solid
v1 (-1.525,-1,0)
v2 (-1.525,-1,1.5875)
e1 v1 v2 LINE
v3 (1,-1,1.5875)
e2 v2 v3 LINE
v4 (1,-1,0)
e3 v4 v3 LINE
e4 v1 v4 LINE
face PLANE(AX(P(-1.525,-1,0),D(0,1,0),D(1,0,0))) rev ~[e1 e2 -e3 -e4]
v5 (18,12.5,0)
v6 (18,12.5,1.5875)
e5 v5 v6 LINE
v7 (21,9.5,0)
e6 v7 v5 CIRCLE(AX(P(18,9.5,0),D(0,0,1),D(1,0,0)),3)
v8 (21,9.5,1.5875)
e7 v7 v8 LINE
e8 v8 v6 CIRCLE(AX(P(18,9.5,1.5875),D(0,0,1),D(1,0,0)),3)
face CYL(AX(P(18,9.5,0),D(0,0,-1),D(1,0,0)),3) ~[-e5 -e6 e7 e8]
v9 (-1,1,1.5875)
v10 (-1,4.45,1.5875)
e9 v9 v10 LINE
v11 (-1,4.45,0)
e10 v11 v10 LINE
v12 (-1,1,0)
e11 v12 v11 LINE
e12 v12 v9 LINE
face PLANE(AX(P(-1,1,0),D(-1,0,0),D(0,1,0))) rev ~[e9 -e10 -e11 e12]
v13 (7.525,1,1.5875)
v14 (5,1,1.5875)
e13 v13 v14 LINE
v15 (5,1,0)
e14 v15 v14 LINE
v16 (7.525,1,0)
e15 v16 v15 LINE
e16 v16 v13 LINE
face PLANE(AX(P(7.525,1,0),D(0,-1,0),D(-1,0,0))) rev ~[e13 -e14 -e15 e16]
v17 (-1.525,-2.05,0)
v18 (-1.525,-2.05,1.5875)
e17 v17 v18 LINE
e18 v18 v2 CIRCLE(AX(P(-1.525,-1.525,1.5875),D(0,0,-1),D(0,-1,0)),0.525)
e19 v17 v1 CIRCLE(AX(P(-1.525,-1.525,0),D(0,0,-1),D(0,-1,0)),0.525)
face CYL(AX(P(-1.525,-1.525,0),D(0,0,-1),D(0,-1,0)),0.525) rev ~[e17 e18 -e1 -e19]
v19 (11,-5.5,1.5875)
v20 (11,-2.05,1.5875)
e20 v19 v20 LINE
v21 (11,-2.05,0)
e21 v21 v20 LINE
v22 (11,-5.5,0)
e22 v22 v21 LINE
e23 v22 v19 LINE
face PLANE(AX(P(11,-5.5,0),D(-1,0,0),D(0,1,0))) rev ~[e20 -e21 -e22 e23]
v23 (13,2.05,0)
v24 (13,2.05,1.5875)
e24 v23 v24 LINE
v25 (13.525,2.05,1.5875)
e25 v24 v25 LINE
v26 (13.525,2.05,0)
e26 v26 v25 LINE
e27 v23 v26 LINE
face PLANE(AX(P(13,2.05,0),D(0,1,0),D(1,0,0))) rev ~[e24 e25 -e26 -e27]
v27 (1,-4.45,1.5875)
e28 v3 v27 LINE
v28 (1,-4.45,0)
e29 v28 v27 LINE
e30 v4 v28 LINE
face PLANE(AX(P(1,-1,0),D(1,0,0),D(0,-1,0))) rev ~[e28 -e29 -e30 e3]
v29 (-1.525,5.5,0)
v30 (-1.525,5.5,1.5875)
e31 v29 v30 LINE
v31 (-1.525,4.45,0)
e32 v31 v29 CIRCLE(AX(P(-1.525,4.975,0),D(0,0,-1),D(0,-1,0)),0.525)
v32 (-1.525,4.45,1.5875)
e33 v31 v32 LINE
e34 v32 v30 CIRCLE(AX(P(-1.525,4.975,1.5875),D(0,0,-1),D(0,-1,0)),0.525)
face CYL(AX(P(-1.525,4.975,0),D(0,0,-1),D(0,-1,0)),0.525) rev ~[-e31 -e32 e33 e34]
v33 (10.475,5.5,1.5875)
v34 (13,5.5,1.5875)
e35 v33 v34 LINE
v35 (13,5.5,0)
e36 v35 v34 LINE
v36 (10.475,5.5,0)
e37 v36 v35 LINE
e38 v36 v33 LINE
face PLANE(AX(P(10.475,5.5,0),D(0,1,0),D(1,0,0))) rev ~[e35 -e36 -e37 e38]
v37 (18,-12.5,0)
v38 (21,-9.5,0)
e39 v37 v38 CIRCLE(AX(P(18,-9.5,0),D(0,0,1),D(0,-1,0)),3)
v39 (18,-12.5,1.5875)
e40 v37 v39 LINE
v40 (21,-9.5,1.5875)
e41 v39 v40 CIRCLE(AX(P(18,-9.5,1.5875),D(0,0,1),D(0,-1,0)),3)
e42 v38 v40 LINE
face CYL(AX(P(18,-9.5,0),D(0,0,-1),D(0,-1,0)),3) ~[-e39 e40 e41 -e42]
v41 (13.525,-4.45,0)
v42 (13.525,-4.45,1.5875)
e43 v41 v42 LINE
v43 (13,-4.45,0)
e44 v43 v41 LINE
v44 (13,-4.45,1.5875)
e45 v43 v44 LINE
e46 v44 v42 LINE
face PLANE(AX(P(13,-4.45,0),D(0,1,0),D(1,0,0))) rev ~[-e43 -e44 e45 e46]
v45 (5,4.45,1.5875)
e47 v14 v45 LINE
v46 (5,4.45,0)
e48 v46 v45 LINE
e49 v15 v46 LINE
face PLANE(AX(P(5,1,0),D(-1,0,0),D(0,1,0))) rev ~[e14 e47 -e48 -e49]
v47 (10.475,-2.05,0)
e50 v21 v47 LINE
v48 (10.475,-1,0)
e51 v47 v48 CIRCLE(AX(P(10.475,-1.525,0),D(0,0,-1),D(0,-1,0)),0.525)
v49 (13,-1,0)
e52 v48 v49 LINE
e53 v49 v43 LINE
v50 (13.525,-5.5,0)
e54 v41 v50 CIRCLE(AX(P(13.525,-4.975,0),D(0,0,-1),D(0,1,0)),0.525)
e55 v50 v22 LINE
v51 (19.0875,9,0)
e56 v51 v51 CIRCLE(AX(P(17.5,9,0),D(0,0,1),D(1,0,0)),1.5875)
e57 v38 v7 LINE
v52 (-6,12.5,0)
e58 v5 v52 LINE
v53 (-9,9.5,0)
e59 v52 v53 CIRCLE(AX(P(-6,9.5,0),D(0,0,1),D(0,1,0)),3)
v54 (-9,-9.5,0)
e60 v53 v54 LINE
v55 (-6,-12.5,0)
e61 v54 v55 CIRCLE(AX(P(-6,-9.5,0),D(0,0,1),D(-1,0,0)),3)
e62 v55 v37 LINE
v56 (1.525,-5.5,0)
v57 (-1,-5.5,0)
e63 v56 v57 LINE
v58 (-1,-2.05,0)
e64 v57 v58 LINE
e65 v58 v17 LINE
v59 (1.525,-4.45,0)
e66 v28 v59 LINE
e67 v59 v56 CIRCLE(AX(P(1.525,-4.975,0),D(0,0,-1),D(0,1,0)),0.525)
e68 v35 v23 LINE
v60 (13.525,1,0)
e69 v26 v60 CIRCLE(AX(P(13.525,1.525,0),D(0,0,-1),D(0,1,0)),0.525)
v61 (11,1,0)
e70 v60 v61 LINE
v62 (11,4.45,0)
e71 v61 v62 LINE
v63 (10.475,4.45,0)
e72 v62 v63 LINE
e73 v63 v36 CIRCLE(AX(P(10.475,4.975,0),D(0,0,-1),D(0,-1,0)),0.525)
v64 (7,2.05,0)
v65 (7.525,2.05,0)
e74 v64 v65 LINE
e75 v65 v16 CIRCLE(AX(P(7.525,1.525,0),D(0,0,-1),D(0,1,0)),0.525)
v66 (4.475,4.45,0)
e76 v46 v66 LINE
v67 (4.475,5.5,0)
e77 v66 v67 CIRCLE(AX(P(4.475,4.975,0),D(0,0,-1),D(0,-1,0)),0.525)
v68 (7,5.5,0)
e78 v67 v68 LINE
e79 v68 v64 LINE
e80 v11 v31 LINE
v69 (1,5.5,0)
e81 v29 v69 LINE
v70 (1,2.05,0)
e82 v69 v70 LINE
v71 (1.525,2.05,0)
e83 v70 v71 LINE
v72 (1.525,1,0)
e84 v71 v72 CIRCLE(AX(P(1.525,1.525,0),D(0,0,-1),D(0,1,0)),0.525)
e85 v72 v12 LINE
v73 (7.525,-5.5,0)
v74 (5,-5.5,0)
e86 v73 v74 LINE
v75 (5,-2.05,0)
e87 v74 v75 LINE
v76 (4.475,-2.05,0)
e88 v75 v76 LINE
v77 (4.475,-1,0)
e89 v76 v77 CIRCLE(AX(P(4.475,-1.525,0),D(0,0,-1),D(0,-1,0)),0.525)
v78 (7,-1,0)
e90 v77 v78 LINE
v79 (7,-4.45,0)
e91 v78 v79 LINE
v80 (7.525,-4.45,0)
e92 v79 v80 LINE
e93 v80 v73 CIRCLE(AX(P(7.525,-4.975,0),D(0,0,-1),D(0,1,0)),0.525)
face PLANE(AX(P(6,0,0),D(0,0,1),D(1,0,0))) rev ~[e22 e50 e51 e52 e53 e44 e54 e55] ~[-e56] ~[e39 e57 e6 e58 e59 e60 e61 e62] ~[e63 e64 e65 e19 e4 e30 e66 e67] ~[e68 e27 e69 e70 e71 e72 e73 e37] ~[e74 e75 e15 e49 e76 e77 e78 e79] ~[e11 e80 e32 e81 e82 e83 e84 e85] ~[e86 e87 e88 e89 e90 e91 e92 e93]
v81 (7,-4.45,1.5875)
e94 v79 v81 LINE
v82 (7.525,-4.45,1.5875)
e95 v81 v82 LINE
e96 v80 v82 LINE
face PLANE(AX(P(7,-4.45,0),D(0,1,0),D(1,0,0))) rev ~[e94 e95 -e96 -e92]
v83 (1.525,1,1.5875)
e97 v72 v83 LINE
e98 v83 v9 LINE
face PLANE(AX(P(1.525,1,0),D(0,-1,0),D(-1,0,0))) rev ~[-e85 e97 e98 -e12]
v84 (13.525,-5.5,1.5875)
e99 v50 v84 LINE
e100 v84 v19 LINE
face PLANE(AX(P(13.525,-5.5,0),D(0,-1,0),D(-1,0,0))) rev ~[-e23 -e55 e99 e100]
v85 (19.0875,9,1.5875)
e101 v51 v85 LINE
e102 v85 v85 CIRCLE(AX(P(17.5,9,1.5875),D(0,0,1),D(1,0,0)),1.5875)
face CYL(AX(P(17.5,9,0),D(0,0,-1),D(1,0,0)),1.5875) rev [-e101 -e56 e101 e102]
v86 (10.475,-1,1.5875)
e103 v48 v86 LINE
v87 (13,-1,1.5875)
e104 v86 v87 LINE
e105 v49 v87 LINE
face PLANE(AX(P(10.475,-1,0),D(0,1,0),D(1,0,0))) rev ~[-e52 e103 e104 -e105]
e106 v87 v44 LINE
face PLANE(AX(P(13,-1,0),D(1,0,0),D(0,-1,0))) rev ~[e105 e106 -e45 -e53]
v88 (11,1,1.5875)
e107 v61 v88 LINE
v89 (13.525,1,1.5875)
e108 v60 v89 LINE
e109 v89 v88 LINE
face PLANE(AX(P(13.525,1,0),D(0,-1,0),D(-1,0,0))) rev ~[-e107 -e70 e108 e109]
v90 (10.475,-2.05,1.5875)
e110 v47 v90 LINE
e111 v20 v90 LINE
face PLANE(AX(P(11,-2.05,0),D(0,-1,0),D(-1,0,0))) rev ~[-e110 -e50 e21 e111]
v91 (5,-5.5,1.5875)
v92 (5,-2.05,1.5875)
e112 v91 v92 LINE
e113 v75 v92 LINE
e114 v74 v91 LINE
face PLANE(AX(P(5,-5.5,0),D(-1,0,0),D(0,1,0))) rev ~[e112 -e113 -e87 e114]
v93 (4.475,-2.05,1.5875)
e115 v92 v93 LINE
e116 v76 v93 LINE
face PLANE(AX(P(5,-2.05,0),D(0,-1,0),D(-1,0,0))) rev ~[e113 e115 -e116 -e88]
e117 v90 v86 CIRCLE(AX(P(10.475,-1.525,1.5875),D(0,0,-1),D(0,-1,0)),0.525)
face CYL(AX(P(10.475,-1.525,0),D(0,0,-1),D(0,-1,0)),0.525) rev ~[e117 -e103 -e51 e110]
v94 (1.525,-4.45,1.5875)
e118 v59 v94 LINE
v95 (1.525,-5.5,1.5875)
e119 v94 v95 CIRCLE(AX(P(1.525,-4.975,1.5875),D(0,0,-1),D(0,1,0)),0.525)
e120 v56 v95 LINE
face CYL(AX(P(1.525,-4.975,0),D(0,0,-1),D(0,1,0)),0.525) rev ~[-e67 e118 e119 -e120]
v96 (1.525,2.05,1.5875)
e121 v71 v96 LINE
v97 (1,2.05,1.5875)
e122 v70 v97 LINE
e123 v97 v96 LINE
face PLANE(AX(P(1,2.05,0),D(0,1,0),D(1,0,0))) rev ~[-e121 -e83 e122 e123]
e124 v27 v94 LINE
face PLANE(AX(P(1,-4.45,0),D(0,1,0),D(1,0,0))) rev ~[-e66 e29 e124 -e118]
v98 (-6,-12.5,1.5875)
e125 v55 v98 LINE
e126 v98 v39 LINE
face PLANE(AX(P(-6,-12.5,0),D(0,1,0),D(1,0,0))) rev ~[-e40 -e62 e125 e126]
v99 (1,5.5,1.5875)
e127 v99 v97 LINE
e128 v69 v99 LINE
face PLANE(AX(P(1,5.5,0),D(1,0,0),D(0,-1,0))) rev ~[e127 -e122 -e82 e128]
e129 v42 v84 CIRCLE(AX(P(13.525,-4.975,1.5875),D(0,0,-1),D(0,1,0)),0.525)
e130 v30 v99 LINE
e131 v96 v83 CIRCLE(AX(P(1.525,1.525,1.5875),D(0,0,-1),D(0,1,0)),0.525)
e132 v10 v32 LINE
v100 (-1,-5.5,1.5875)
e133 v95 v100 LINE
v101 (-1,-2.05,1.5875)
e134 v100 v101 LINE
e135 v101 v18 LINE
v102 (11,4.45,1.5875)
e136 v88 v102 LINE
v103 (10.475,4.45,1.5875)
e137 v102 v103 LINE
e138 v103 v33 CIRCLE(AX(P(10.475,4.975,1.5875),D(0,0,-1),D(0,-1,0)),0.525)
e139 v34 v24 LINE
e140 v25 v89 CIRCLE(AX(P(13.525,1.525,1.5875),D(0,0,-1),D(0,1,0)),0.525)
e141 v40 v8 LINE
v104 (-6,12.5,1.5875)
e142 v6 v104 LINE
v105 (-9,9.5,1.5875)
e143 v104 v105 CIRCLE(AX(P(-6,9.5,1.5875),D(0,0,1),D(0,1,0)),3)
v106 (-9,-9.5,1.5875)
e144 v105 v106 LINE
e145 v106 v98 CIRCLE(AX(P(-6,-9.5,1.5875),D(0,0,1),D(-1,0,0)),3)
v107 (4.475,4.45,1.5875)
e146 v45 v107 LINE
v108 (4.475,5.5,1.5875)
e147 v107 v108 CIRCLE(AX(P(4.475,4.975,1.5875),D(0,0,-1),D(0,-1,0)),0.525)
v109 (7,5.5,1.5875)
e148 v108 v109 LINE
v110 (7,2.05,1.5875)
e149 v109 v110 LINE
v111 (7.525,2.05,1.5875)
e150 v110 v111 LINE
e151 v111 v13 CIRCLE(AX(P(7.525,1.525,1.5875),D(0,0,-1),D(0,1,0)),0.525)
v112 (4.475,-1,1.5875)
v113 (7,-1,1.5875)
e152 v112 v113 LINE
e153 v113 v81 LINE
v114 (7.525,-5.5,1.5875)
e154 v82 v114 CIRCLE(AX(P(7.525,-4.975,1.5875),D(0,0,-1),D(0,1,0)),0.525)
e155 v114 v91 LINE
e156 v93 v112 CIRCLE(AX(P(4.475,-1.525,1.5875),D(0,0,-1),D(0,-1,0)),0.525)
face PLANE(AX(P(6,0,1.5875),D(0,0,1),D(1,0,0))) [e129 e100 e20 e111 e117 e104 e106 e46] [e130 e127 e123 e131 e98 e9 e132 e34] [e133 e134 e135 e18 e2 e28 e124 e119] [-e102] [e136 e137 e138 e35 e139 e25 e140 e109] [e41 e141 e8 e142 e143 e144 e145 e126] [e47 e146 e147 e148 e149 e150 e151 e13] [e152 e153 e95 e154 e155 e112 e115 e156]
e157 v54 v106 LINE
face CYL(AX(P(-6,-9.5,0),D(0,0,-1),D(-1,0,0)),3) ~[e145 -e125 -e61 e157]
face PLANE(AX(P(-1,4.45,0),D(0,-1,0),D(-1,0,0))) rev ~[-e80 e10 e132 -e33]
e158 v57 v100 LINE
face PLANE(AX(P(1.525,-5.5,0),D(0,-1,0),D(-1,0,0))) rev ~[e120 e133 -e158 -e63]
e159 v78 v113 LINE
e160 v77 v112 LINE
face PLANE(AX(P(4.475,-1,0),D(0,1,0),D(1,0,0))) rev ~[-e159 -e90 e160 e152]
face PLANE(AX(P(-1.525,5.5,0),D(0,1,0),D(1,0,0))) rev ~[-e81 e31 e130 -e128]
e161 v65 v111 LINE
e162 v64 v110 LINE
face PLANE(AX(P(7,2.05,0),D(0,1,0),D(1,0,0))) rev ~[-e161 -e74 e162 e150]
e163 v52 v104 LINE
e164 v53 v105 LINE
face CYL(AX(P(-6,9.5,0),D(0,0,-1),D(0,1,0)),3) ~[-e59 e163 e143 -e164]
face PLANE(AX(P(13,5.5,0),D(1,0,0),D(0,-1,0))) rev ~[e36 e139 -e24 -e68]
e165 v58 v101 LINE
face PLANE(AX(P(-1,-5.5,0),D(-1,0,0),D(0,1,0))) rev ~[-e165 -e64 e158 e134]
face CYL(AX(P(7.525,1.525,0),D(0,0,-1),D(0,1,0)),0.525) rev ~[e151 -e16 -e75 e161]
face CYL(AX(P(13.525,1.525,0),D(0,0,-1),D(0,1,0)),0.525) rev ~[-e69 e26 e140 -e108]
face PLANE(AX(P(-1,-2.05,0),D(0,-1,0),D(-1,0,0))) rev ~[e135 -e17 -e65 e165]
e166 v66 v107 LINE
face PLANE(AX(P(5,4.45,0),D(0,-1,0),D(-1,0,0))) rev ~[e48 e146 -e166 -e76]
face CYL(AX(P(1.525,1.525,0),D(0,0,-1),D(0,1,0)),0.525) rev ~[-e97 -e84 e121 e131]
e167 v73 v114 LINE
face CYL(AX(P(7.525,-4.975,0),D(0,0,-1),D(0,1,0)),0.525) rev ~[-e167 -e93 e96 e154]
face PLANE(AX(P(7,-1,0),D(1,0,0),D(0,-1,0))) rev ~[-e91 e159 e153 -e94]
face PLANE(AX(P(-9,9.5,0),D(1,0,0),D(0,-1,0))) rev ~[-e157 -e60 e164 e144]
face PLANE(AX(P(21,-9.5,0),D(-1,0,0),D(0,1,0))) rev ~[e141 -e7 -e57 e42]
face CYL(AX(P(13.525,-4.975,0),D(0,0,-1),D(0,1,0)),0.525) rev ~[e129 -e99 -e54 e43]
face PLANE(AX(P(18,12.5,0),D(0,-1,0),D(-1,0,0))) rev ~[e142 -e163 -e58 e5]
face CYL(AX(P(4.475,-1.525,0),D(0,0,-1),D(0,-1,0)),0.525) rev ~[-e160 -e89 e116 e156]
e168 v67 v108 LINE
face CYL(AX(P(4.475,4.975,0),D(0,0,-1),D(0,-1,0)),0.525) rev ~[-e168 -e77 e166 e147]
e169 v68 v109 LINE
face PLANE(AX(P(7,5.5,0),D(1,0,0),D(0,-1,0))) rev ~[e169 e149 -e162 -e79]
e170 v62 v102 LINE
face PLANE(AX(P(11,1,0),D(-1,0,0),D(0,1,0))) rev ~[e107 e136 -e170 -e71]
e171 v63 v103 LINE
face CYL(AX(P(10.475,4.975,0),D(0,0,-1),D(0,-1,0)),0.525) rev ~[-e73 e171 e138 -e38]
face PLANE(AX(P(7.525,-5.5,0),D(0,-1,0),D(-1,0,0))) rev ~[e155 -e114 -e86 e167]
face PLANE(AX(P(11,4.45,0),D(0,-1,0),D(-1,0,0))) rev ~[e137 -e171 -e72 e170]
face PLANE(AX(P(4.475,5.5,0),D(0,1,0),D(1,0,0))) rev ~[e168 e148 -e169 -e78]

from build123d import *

# Parameters (mm, degrees)
F0_R     = 1.5875
F1_DEPTH = 1.5875


# Not quite as in the source:
# - a length typed as a fraction of an inch, garbled in the dataset ("3 / 203.2 mm" for 3/8 in), is restored


with BuildPart() as f1:
    # F0 (on Top) → F1 (new body)
    with BuildSketch(Plane.XY):
        with BuildLine():
            Line((-6, -12.5), (18, -12.5))
            ThreePointArc((18, -12.5), (20.1213203436, -11.6213203436), (21, -9.5))
            Line((21, -9.5), (21, 9.5))
            ThreePointArc((21, 9.5), (20.1213203436, 11.6213203436), (18, 12.5))
            Line((18, 12.5), (-6, 12.5))
            ThreePointArc((-6, 12.5), (-8.1213203436, 11.6213203436), (-9, 9.5))
            Line((-9, 9.5), (-9, -9.5))
            ThreePointArc((-9, -9.5), (-8.1213203436, -11.6213203436), (-6, -12.5))
        make_face()
        with BuildLine():
            Line((1.525, -5.5), (1, -5.5))
            Line((1, -5.5), (-1, -5.5))
            Line((-1, -5.5), (-1, -2.05))
            Line((-1, -2.05), (-1.525, -2.05))
            ThreePointArc((-1.525, -2.05), (-2.05, -1.525), (-1.525, -1))
            Line((-1.525, -1), (-1, -1))
            Line((-1, -1), (1, -1))
            Line((1, -1), (1, -4.45))
            Line((1, -4.45), (1.525, -4.45))
            ThreePointArc((1.525, -4.45), (2.05, -4.975), (1.525, -5.5))
        make_face(mode=Mode.SUBTRACT)
        with BuildLine():
            Line((7.525, -5.5), (7, -5.5))
            Line((7, -5.5), (5, -5.5))
            Line((5, -5.5), (5, -2.05))
            Line((5, -2.05), (4.475, -2.05))
            ThreePointArc((4.475, -2.05), (3.95, -1.525), (4.475, -1))
            Line((4.475, -1), (5, -1))
            Line((5, -1), (7, -1))
            Line((7, -1), (7, -4.45))
            Line((7, -4.45), (7.525, -4.45))
            ThreePointArc((7.525, -4.45), (8.05, -4.975), (7.525, -5.5))
        make_face(mode=Mode.SUBTRACT)
        with BuildLine():
            Line((13.525, -5.5), (13, -5.5))
            Line((13, -5.5), (11, -5.5))
            Line((11, -5.5), (11, -2.05))
            Line((11, -2.05), (10.475, -2.05))
            ThreePointArc((10.475, -2.05), (9.95, -1.525), (10.475, -1))
            Line((10.475, -1), (11, -1))
            Line((11, -1), (13, -1))
            Line((13, -1), (13, -4.45))
            Line((13, -4.45), (13.525, -4.45))
            ThreePointArc((13.525, -4.45), (14.05, -4.975), (13.525, -5.5))
        make_face(mode=Mode.SUBTRACT)
        with BuildLine():
            Line((-1, 5.5), (1, 5.5))
            Line((1, 5.5), (1, 2.05))
            Line((1, 2.05), (1.525, 2.05))
            ThreePointArc((1.525, 2.05), (2.05, 1.525), (1.525, 1))
            Line((1.525, 1), (1, 1))
            Line((1, 1), (-1, 1))
            Line((-1, 1), (-1, 4.45))
            Line((-1, 4.45), (-1.525, 4.45))
            ThreePointArc((-1.525, 4.45), (-2.05, 4.975), (-1.525, 5.5))
            Line((-1.525, 5.5), (-1, 5.5))
        make_face(mode=Mode.SUBTRACT)
        with BuildLine():
            Line((7.525, 1), (7, 1))
            Line((7, 1), (5, 1))
            Line((5, 1), (5, 4.45))
            Line((5, 4.45), (4.475, 4.45))
            ThreePointArc((4.475, 4.45), (3.95, 4.975), (4.475, 5.5))
            Line((4.475, 5.5), (5, 5.5))
            Line((5, 5.5), (7, 5.5))
            Line((7, 5.5), (7, 2.05))
            Line((7, 2.05), (7.525, 2.05))
            ThreePointArc((7.525, 2.05), (8.05, 1.525), (7.525, 1))
        make_face(mode=Mode.SUBTRACT)
        with BuildLine():
            Line((13.525, 1), (13, 1))
            Line((13, 1), (11, 1))
            Line((11, 1), (11, 4.45))
            Line((11, 4.45), (10.475, 4.45))
            ThreePointArc((10.475, 4.45), (9.95, 4.975), (10.475, 5.5))
            Line((10.475, 5.5), (11, 5.5))
            Line((11, 5.5), (13, 5.5))
            Line((13, 5.5), (13, 2.05))
            Line((13, 2.05), (13.525, 2.05))
            ThreePointArc((13.525, 2.05), (14.05, 1.525), (13.525, 1))
        make_face(mode=Mode.SUBTRACT)
        with Locations((17.5, 9)):
            Circle(F0_R, mode=Mode.SUBTRACT)
    extrude(amount=F1_DEPTH)


solid = f1.part
